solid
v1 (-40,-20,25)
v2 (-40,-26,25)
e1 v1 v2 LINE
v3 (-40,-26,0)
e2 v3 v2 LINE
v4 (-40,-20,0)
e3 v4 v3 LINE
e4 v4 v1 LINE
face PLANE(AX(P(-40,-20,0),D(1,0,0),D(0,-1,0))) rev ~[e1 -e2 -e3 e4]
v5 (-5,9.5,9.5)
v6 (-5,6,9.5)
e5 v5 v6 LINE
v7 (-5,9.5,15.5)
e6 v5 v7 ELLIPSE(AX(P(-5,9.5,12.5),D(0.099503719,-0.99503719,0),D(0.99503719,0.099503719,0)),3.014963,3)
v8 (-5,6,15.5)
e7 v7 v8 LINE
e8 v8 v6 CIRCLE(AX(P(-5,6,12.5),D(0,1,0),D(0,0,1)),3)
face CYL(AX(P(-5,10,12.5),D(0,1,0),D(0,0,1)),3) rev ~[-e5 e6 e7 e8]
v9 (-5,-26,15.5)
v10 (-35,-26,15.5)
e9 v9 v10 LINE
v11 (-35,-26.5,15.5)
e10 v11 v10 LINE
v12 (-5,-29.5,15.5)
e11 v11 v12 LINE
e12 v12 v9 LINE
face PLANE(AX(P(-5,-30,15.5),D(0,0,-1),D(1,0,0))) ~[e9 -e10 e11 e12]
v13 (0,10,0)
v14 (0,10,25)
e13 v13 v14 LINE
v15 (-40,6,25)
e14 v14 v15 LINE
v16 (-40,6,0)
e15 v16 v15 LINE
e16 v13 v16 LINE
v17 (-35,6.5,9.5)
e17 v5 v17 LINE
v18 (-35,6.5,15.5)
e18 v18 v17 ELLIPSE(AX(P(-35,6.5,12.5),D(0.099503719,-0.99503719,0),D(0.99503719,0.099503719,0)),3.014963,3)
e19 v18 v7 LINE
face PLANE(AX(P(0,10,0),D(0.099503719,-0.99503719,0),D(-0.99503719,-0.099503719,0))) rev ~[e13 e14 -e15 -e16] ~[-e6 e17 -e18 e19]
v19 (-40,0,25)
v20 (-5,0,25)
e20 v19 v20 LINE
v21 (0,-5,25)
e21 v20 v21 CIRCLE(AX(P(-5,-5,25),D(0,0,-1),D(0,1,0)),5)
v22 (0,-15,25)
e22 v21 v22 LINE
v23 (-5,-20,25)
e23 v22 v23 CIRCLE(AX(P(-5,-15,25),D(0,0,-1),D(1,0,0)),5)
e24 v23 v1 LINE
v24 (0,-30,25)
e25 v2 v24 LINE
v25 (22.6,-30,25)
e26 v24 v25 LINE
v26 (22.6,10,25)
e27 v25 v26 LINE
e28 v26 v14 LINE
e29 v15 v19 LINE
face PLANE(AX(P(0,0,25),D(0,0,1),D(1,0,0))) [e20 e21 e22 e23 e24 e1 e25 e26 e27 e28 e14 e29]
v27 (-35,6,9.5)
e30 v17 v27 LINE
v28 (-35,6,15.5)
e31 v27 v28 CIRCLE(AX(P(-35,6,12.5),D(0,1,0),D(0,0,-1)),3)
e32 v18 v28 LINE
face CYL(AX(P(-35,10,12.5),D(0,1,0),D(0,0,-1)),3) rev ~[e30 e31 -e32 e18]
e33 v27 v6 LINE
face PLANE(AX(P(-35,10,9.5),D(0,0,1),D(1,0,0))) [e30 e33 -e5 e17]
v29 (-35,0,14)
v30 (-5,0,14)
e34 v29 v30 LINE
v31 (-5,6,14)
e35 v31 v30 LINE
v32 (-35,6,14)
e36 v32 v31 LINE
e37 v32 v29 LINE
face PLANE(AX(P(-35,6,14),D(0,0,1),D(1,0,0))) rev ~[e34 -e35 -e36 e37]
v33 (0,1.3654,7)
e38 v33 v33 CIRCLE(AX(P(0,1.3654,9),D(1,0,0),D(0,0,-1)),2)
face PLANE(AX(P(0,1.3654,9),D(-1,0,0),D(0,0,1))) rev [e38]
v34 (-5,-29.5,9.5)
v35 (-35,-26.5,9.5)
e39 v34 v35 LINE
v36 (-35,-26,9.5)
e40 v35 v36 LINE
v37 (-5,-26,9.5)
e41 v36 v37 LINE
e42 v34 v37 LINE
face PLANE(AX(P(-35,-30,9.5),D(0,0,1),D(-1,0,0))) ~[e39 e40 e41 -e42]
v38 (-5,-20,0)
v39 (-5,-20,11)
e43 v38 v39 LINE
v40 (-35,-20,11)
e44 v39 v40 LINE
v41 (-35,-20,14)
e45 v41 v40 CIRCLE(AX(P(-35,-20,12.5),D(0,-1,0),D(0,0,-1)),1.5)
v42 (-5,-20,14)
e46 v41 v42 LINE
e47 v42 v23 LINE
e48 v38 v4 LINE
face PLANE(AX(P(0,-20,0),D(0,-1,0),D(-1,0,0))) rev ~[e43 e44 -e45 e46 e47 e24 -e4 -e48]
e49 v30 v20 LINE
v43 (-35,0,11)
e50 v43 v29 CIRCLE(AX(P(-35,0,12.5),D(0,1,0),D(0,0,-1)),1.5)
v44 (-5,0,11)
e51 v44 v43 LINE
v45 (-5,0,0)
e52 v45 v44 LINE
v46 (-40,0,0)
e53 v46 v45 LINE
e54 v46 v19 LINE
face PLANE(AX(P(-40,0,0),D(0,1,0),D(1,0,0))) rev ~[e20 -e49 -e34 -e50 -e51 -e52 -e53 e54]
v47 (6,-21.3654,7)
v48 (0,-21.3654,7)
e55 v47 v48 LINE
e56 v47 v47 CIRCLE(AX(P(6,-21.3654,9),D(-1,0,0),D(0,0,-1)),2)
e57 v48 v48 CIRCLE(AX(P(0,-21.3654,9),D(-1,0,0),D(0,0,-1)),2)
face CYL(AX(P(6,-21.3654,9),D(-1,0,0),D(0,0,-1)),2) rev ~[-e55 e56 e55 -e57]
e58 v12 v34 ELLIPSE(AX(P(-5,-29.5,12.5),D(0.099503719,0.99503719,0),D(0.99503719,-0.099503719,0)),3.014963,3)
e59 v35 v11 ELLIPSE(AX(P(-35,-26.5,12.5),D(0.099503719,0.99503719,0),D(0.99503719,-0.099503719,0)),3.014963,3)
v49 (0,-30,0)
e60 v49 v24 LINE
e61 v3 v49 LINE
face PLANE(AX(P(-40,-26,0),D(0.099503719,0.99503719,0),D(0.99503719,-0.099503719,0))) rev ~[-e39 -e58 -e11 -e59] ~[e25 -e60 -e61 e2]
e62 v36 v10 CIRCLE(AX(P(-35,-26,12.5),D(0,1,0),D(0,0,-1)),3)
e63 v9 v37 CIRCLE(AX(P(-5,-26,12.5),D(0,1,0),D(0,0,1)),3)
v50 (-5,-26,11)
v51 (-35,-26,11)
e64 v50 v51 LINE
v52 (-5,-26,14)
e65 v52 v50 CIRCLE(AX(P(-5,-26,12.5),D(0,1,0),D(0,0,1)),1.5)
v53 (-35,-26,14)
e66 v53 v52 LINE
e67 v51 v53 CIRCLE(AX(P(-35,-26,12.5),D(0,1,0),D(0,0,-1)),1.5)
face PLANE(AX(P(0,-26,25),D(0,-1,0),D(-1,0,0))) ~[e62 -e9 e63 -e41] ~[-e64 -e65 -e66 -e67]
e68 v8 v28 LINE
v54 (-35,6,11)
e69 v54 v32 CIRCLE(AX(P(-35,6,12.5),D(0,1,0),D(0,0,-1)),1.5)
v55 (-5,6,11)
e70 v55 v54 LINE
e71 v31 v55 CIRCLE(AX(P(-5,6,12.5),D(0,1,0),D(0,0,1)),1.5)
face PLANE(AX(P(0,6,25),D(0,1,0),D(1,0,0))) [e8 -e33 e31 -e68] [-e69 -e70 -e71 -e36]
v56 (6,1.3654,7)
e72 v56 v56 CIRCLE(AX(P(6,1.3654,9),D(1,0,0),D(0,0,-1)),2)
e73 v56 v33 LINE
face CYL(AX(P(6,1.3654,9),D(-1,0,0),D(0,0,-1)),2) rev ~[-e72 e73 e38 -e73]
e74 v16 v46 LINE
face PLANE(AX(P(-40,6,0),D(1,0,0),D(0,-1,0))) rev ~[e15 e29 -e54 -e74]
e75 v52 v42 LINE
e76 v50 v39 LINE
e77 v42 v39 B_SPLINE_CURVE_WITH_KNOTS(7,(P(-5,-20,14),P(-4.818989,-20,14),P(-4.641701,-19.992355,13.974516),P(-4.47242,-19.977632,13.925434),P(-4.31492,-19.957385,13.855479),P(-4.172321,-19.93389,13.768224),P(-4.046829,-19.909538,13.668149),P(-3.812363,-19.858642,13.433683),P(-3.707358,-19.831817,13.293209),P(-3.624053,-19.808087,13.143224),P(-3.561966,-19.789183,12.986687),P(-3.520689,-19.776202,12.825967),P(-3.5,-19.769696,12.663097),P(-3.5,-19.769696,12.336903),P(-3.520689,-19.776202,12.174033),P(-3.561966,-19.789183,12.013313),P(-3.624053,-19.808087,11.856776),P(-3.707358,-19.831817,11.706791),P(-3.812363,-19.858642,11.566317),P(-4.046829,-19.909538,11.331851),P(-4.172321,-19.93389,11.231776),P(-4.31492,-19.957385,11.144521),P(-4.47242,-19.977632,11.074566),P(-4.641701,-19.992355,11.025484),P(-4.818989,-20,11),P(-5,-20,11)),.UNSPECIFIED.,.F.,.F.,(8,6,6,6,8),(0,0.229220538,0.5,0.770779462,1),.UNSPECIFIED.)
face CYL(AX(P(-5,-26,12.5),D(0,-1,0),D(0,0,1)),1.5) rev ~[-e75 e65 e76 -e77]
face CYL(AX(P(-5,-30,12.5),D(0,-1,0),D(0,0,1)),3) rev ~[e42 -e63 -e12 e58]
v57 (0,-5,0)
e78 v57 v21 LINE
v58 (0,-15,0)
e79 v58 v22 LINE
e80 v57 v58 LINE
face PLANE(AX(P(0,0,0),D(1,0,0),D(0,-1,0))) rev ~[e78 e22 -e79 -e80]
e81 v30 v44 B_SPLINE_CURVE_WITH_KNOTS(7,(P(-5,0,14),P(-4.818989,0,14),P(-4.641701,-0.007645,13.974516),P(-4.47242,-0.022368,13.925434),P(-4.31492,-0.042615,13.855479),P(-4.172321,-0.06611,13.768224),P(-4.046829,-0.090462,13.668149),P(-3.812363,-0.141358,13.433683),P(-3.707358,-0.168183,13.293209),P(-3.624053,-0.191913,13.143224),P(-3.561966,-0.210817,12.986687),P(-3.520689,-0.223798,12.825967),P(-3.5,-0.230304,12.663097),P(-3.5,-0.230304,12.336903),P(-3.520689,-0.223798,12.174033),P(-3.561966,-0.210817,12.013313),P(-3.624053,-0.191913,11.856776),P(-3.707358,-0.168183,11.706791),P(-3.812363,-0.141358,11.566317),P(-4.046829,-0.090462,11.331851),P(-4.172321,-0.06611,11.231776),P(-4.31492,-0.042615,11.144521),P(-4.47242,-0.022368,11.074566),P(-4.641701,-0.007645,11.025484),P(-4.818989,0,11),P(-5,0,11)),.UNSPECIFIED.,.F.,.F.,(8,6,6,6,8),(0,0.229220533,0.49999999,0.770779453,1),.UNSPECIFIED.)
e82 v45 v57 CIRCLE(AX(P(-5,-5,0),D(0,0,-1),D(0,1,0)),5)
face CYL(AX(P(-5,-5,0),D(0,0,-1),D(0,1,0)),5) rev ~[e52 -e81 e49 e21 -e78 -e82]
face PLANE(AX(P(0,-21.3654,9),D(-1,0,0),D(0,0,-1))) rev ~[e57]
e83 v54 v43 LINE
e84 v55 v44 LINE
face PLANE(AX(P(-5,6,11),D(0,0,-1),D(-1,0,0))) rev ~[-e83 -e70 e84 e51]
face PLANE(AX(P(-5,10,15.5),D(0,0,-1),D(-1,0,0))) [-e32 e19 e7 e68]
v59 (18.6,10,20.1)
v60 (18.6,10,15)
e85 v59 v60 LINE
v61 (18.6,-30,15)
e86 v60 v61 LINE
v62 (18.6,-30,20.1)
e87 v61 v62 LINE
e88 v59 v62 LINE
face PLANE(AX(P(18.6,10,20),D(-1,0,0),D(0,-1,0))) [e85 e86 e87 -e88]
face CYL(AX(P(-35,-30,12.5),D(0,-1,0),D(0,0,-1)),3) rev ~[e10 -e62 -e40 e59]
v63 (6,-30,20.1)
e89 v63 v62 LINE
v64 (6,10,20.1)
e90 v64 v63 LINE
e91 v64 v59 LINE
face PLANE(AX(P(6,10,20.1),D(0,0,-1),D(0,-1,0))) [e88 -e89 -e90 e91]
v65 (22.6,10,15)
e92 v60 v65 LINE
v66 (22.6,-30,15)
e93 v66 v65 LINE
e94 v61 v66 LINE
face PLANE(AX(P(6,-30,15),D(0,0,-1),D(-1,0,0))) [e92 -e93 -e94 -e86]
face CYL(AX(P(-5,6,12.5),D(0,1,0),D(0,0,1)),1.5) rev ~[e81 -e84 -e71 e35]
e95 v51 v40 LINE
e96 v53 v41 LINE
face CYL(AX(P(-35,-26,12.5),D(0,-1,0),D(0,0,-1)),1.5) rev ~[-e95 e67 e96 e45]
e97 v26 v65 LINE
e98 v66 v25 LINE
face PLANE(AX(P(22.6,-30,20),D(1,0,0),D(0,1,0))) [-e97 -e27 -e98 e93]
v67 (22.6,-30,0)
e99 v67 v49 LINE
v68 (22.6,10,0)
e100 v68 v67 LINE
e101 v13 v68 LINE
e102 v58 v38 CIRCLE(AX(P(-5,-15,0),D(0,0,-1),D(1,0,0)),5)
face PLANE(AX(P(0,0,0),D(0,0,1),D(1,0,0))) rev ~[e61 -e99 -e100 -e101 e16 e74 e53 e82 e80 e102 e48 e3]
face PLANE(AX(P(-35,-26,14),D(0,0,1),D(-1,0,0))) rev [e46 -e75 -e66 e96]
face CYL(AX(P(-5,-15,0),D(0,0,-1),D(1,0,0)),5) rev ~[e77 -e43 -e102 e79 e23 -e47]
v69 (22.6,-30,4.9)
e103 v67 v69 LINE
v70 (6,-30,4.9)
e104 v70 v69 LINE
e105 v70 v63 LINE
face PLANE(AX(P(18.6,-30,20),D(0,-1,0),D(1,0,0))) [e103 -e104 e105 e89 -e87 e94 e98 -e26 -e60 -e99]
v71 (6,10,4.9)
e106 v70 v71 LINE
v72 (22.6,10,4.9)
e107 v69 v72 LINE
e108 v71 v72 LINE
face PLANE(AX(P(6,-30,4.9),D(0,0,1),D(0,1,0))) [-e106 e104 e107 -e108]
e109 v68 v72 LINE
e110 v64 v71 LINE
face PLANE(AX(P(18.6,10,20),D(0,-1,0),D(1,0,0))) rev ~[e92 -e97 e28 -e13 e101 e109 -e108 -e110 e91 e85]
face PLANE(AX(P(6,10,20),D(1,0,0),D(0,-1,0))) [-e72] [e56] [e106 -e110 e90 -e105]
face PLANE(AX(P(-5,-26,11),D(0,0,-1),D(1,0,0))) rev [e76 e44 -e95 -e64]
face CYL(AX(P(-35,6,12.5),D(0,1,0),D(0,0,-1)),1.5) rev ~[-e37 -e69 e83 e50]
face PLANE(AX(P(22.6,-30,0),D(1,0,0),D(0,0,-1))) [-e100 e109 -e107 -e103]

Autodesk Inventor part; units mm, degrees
ref_plane "YZ Plane" through (0, 0, 0) normal (1, 0, 0) x (0, 1, 0)
ref_plane "XZ Plane" through (0, 0, 0) normal (0, 1, 0) x (-1, 0, 0)
sketch "Sketch1" plane through (0, 0, 0) normal (0, 0, 1) x (1, 0, 0)
  line L0 (-40, 0) -> (0, 0)
  line L1 (0, 0) -> (0, -20)
  line L2 (0, -20) -> (-40, -20)
  line L3 (-40, -20) -> (-40, -26)
  line L4 (-40, -26) -> (0, -30)
  line L5 (0, -30) -> (6, -30)
  line L6 (6, -30) -> (6, 10)
  line L7 (6, 10) -> (0, 10)
  line L8 (0, 10) -> (-40, 6)
  line L9 (-40, 6) -> (-40, 0)
  dimension "d0" = 6
  dimension "d1" = 40
  dimension "d2" = 20
  dimension "d3" = 40
extrude "Extrusion1" add sketch "Sketch1" along normal blind 25
sketch "Sketch2" plane through (6, -30, 0) normal (1, 0, 0) x (0, 0, -1)
  line L0 (0, 40) -> (-25, 40) projected
  line L1 (0, 0) -> (-25, 0) projected
  line L2 (-25, 40) -> (-20, 40)
  line L3 (-20, 40) -> (-20, 0)
  line L4 (-20, 0) -> (-25, 0)
  line L5 (-25, 0) -> (-25, 40)
  line L6 (0, 0) -> (-5, 0)
  line L7 (-5, 0) -> (-5, 40)
  line L8 (-5, 40) -> (0, 40)
  line L9 (0, 40) -> (0, 0)
  circle A0 centre (-9, 8.6346) radius 1.7
  line L10 (-2.5, 11.8846) -> (-2.5, 5.3846)
  point P0 (0, 30)
  point P1 (-25, 0)
  point P2 (-5, 0)
  dimension "d6" = 5
  dimension "d7" = 5
  dimension "d30" = 4
  dimension "d31" = 8.6346
extrude "Extrusion2" add sketch "Sketch2" along normal blind 16.6 contours L9 L1 L7 L0 | L3 L1 L5 L0
hole "Hole2" at (6, -21.3654, 9) direction (-1, 0, 0) diameter 4 depth 6
sketch "Sketch3" plane through (0, 0, 0) normal (0, 0, -1) x (-1, 0, 0)
  line L0 (0, 0) -> (0, -20) projected
  arc A0 (0, -15) -> (5, -20) centre (5, -15) ccw
  arc A1 (5, 0) -> (0, -5) centre (5, -5) ccw
  line L1 (0, -20) -> (40, -20) projected
  line L2 (40, 0) -> (0, 0) projected
  dimension "d27" = 5
extrude "Extrusion3" add sketch "Sketch3" against normal up to surface (25 mm away)
sketch "Sketch4" plane through (0, 10, 25) normal (0, 1, 0) x (1, 0, 0)
  line L0 (-5, 12.5) -> (-35, 12.5) construction
  line L1 (-5, 9.5) -> (-35, 9.5)
  line L2 (-35, 15.5) -> (-5, 15.5)
  arc A0 (-5, 9.5) -> (-5, 15.5) centre (-5, 12.5) ccw
  arc A1 (-35, 15.5) -> (-35, 9.5) centre (-35, 12.5) ccw
  line L3 (-40, 25) -> (-40, 0) projected
  line L4 (0, 25) -> (0, 0) projected
  point P0 (-20, 12.5)
  point P1 (0, 12.5)
  dimension "d32" = 3
  dimension "d33" = 5
  dimension "d34" = 5
extrude "Extrusion4" cut sketch "Sketch4" against normal blind 4
sketch "Sketch5" plane through (0, 6, 25) normal (0, 1, 0) x (1, 0, 0)
  line L0 (-5, 12.5) -> (-35, 12.5) construction
  line L1 (-5, 14) -> (-35, 14)
  line L2 (-35, 11) -> (-5, 11)
  arc A0 (-5, 11) -> (-5, 14) centre (-5, 12.5) ccw
  arc A1 (-35, 14) -> (-35, 11) centre (-35, 12.5) ccw
  line L3 (-5, 9.5) -> (-35, 9.5) projected
  arc A2 (-5, 9.5) -> (-5, 15.5) centre (-5, 12.5) ccw projected
  line L4 (-35, 15.5) -> (-5, 15.5) projected
  arc A3 (-35, 15.5) -> (-35, 9.5) centre (-35, 12.5) ccw projected
  point P0 (0, 25)
  point P1 (-20, 12.5)
  dimension "d37" = 1.5
extrude "Extrusion5" cut sketch "Sketch5" against normal blind 10.75 contours A0 L2 A1 L1
ref_plane "Work Plane1" through (-40, -10, 25) normal (0, 1, 0) x (1, 0, 0)
mirror "Mirror1" about plane through (-40, -10, 25) normal (0, 1, 0) of "Extrusion4", "Extrusion5", "Hole2"
sketch "Sketch6" plane through (6, -30, 20) normal (0, 0, -1) x (-1, 0, 0)
  line L0 (0, 40) -> (0, 0) projected
  line L1 (0, 40) -> (-16.6, 40) projected
  line L2 (-16.6, 0) -> (-16.6, 40) projected
  line L3 (0, 0) -> (-16.6, 0) projected
  line L4 (-16.6, 40) -> (-16.6, 0) projected
  line L5 (0, 0) -> (-16.6, 0) projected
  line L6 (-16.6, 40) -> (-12.6, 40)
  line L7 (-12.6, 40) -> (-12.6, 0)
  line L8 (-12.6, 0) -> (-16.6, 0)
  line L9 (-16.6, 0) -> (-16.6, 40)
  point P0 (6, 30)
  dimension "d40" = 4
extrude "Extrusion6" add sketch "Sketch6" along normal blind 5 contours L7 L3 L2 L1
thicken "Thicken1" operation add thickness 0.1 both sides no extend neighbours yes toward (0, 0, 1) faces at (14.4, -3.3333, 20) (11.5333, -3.3333, 5)
properties part number "Z Belt 2"
